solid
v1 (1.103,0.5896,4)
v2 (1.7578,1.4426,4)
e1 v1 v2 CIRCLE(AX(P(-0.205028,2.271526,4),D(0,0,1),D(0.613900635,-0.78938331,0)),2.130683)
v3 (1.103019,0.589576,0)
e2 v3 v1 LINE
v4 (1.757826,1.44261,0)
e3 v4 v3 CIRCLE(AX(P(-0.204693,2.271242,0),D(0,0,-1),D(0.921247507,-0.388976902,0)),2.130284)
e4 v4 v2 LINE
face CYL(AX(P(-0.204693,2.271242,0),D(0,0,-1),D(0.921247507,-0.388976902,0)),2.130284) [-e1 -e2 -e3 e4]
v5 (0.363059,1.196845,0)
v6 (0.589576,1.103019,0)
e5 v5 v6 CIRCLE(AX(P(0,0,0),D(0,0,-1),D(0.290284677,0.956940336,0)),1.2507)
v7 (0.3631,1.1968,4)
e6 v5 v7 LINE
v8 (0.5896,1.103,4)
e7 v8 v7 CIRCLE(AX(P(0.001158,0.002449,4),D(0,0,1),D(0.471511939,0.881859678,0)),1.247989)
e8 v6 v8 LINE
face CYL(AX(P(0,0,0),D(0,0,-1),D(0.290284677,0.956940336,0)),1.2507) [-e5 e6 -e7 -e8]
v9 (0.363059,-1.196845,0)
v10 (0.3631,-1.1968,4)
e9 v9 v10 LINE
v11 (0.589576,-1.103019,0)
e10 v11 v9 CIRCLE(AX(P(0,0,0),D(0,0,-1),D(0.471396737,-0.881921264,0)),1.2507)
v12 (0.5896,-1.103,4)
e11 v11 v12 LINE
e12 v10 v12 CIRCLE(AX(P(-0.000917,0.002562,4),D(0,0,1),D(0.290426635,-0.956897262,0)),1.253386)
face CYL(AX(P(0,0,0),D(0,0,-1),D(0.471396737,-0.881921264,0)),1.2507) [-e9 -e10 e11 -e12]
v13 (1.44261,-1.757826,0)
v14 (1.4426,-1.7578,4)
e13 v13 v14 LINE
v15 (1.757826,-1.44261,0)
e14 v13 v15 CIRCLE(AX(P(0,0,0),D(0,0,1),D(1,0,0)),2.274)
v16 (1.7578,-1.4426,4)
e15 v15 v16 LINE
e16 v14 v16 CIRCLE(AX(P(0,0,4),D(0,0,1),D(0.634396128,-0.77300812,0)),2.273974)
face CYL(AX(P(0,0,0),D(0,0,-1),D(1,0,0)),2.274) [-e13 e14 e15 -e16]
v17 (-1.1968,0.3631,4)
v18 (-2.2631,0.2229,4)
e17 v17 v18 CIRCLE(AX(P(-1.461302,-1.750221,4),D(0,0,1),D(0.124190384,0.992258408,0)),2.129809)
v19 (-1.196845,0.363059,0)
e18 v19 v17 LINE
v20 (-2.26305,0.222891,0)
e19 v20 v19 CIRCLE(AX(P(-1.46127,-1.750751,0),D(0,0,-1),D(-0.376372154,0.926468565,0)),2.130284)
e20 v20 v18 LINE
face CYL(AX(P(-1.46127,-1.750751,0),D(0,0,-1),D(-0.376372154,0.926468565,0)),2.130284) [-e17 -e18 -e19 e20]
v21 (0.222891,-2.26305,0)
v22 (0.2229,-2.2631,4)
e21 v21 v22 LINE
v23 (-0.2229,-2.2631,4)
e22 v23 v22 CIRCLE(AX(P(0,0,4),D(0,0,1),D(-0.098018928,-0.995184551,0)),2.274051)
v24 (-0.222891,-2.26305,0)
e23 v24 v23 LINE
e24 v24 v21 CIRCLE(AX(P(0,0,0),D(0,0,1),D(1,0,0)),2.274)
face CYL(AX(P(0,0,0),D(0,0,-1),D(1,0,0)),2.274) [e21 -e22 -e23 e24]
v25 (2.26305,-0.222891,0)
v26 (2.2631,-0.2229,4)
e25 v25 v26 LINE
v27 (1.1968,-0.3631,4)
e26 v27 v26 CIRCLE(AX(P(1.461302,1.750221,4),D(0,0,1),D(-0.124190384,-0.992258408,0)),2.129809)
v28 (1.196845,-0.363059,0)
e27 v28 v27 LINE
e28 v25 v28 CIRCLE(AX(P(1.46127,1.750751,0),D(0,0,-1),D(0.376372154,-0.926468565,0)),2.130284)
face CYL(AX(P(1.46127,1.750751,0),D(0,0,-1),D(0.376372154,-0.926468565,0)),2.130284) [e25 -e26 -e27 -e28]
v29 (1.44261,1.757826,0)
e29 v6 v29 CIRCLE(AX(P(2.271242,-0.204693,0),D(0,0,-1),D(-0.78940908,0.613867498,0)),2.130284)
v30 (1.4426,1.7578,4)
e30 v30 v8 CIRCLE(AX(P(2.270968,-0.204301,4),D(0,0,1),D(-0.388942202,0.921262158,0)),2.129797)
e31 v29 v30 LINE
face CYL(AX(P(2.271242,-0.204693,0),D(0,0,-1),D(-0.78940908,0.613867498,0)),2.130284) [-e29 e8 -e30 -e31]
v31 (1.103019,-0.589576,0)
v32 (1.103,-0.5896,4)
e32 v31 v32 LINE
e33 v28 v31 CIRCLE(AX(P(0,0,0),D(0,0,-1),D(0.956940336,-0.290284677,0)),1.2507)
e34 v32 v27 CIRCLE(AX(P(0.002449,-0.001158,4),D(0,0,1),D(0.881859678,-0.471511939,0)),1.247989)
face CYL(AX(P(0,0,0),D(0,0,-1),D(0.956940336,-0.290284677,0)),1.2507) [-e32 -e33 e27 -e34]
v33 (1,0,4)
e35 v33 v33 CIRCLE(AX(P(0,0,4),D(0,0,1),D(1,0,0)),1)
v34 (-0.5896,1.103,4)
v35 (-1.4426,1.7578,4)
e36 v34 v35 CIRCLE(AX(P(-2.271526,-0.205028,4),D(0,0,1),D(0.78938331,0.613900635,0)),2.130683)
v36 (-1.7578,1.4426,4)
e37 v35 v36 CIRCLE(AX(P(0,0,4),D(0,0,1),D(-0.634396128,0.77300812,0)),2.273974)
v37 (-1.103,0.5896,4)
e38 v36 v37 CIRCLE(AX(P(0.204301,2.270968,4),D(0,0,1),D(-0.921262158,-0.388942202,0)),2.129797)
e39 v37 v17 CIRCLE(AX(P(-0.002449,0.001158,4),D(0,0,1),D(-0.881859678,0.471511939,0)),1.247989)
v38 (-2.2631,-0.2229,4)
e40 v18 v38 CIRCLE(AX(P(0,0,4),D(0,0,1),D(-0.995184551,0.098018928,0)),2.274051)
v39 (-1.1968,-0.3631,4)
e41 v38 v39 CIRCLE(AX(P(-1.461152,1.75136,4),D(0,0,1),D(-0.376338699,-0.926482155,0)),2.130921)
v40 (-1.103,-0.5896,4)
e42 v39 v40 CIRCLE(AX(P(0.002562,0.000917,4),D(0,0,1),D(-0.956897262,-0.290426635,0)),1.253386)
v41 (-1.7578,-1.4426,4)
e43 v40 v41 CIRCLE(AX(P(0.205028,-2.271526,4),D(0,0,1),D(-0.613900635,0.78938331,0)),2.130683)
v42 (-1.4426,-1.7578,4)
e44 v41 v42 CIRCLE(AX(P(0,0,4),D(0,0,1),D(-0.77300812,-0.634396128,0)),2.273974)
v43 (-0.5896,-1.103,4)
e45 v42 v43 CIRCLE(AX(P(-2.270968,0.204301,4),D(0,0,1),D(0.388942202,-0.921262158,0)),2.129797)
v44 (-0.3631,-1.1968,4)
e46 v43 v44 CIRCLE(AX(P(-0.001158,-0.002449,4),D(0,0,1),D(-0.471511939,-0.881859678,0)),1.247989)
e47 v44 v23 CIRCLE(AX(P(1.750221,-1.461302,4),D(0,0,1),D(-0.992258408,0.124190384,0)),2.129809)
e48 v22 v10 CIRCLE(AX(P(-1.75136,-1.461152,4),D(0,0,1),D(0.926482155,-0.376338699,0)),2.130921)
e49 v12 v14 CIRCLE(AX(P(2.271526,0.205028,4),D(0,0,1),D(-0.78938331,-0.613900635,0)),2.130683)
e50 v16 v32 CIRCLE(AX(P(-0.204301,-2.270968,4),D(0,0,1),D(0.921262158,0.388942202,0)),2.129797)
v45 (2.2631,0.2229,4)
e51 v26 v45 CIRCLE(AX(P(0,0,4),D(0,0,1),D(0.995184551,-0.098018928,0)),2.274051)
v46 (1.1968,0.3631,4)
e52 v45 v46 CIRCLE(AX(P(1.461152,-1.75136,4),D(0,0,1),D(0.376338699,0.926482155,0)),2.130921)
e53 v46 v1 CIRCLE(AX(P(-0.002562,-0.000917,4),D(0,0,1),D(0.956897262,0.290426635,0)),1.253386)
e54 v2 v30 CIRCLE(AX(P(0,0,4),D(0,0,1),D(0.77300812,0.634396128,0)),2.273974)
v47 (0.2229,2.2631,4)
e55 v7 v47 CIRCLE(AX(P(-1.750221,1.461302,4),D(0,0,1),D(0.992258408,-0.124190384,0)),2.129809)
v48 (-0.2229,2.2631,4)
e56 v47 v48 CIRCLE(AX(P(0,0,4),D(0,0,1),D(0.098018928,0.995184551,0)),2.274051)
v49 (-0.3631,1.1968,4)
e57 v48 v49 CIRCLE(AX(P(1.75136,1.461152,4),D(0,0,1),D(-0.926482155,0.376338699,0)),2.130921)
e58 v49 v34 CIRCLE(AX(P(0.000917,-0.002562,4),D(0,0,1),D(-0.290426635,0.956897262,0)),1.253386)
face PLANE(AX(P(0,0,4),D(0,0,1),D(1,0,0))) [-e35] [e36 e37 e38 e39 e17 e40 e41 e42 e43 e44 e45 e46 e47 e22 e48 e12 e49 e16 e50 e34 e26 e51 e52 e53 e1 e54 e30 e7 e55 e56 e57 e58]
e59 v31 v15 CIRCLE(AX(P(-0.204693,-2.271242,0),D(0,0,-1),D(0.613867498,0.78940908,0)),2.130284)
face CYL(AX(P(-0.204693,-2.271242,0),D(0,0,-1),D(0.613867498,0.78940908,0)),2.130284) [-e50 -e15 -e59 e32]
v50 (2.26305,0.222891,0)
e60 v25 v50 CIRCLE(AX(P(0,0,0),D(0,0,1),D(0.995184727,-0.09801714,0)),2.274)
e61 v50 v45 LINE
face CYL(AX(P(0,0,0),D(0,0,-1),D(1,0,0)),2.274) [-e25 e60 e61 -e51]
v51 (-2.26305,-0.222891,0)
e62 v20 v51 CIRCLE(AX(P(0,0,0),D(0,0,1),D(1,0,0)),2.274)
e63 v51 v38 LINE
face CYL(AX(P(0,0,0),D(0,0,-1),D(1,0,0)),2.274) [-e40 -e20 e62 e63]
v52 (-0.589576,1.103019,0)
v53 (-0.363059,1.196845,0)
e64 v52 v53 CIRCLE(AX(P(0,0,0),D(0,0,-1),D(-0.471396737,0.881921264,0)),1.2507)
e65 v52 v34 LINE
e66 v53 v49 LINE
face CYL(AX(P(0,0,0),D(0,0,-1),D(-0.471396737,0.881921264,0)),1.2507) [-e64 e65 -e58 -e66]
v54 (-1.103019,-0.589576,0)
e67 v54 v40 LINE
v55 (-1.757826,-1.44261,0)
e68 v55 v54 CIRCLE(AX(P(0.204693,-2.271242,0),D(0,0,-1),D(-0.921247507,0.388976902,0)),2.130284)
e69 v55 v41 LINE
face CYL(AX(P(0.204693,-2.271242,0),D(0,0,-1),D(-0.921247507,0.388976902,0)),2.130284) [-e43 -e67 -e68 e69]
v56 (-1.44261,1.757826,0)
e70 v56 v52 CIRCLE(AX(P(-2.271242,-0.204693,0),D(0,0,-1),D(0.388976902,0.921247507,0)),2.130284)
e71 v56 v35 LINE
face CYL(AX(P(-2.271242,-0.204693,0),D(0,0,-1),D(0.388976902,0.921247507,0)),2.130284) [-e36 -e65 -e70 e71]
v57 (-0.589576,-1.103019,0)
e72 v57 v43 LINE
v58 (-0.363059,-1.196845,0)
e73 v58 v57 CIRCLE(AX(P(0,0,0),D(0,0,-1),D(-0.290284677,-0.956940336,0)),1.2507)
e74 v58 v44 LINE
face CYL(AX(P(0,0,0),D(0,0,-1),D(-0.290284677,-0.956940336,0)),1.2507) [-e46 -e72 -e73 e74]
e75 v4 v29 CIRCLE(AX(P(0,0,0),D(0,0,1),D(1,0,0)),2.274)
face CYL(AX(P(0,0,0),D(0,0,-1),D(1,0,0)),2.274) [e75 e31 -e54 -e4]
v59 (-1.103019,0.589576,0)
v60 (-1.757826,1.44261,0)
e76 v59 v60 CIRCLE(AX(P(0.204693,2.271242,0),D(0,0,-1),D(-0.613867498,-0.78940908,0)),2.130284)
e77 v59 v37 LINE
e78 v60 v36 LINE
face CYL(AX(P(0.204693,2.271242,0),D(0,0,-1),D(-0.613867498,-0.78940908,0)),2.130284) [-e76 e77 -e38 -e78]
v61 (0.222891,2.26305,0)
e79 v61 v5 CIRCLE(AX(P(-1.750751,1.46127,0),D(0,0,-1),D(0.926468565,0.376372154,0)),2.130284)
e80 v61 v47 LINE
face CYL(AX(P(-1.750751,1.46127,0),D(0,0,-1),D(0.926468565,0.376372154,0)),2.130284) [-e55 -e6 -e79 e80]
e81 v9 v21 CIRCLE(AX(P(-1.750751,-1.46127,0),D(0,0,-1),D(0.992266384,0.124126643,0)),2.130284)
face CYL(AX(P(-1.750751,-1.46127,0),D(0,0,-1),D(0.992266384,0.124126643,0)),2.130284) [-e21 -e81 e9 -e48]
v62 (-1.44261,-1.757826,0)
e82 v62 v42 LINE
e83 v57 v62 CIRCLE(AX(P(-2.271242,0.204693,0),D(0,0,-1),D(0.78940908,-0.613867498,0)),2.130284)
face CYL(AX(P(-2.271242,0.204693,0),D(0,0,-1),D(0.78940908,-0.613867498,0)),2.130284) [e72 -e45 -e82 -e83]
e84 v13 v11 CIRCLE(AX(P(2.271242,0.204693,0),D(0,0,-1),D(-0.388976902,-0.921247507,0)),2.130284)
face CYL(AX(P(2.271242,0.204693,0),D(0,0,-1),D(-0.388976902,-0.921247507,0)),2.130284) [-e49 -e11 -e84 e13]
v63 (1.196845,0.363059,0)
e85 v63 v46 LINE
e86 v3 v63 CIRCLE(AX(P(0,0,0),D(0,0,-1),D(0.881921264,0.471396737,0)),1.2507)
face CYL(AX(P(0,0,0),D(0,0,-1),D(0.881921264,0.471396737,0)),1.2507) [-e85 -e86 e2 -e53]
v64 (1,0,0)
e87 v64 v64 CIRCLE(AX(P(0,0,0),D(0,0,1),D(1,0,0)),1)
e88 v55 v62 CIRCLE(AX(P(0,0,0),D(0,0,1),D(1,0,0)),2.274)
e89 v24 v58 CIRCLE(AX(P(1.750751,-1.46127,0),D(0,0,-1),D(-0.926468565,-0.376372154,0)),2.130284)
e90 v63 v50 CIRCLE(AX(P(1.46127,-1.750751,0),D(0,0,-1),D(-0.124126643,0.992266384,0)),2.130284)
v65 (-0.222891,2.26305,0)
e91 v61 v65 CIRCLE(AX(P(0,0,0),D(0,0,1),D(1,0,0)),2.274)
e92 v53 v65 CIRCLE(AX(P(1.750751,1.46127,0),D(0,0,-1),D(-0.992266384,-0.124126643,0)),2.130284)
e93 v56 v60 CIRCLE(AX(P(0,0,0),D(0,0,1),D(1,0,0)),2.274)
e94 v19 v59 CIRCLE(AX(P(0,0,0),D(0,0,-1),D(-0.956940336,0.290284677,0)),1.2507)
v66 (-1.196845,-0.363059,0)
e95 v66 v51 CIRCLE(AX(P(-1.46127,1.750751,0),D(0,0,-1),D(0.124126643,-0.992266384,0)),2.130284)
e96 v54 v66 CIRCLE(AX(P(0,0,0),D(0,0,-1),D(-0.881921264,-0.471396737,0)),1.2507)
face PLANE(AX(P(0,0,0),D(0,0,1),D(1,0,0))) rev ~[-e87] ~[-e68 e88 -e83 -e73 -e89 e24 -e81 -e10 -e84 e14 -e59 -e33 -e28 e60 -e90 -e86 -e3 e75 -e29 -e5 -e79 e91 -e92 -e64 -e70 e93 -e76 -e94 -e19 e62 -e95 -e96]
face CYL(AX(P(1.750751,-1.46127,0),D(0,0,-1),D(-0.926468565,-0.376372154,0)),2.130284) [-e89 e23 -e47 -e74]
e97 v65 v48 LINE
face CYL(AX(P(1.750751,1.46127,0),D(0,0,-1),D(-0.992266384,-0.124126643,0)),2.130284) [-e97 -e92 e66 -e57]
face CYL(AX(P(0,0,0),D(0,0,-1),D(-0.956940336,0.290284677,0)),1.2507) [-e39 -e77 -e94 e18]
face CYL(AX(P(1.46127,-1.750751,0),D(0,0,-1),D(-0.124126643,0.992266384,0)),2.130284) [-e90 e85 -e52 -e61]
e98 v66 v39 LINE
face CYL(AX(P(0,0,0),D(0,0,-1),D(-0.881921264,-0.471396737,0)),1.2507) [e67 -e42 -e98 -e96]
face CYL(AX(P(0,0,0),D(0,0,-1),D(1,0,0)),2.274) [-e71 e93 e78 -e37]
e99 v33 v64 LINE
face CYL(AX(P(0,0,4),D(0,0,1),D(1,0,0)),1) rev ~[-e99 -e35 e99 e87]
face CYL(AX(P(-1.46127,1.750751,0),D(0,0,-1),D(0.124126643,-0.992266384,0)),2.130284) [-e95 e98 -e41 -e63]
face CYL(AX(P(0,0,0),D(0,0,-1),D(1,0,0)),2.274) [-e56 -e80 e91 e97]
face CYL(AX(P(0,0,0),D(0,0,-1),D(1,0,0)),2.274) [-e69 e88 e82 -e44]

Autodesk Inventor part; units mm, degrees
sketch "Sketch1" plane through (0, 0, 0) normal (0, 0, 1) x (1, 0, 0)
  circle A0 centre (0, 0) radius 2.274
  dimension "d0" = 4.548
extrude "Extrusion1" add sketch "Sketch1" along normal blind 20
ref_plane "Work Plane2" through (0, 0, 10) normal (0, 0, 1) x (1, 0, 0)
sketch "Sketch2" plane through (0, 0, 0) normal (0, 0, -1) x (-1, 0, 0)
  circle A0 centre (0, 0) radius 2.274 projected
  circle A1 centre (0, 0) radius 1.8192
  dimension "d3" = 3.6384
surface extrude "Pitch Diameter" sketch "Sketch2" against normal through all shown no curves A1
ref_plane "Work Plane8" through (0, 0, 0) normal (0.9238795, 0.3826834, 0) x (0, 0, 1)
ref_plane "Work Plane9" through (0, 0, 0) normal (1, 0, 0) x (0, 1, 0)
spur gear teeth "Spur Gear" teeth 8 pitch diameter 3.6384 tip diameter 4.548 root diameter 2.5014 face width 20 start plane through (0, 0, 0) normal (0, 0, -1) x (-1, 0, 0)
sketch "Sketch3" plane through (0, 0, 20) normal (0, 0, 1) x (1, 0, 0)
  arc A0 (-1.7578, 1.4426) -> (-1.103, 0.5896) centre (0.2047, 2.2712) ccw projected
  arc A1 (-1.103, 0.5896) -> (-1.1968, 0.3631) centre (0, 0) ccw projected
  arc A2 (-1.1968, 0.3631) -> (-2.2631, 0.2229) centre (-1.4613, -1.7508) ccw projected
  arc A3 (-2.2631, 0.2229) -> (-2.2631, -0.2229) centre (0, 0) ccw projected
  arc A4 (-2.2631, -0.2229) -> (-1.1968, -0.3631) centre (-1.4613, 1.7508) ccw projected
  arc A5 (-1.1968, -0.3631) -> (-1.103, -0.5896) centre (0, 0) ccw projected
  arc A6 (-1.103, -0.5896) -> (-1.7578, -1.4426) centre (0.2047, -2.2712) ccw projected
  arc A7 (-1.7578, -1.4426) -> (-1.4426, -1.7578) centre (0, 0) ccw projected
  arc A8 (-1.4426, -1.7578) -> (-0.5896, -1.103) centre (-2.2712, 0.2047) ccw projected
  arc A9 (-0.5896, -1.103) -> (-0.3631, -1.1968) centre (0, 0) ccw projected
  arc A10 (-0.3631, -1.1968) -> (-0.2229, -2.2631) centre (1.7508, -1.4613) ccw projected
  arc A11 (-0.2229, -2.2631) -> (0.2229, -2.2631) centre (0, 0) ccw projected
  arc A12 (0.2229, -2.2631) -> (0.3631, -1.1968) centre (-1.7508, -1.4613) ccw projected
  arc A13 (0.3631, -1.1968) -> (0.5896, -1.103) centre (0, 0) ccw projected
  arc A14 (0.5896, -1.103) -> (1.4426, -1.7578) centre (2.2712, 0.2047) ccw projected
  arc A15 (1.4426, -1.7578) -> (1.7578, -1.4426) centre (0, 0) ccw projected
  arc A16 (1.7578, -1.4426) -> (1.103, -0.5896) centre (-0.2047, -2.2712) ccw projected
  arc A17 (1.103, -0.5896) -> (1.1968, -0.3631) centre (0, 0) ccw projected
  arc A18 (1.1968, -0.3631) -> (2.2631, -0.2229) centre (1.4613, 1.7508) ccw projected
  arc A19 (2.2631, -0.2229) -> (2.2631, 0.2229) centre (0, 0) ccw projected
  arc A20 (2.2631, 0.2229) -> (1.1968, 0.3631) centre (1.4613, -1.7508) ccw projected
  arc A21 (1.1968, 0.3631) -> (1.103, 0.5896) centre (0, 0) ccw projected
  arc A22 (1.103, 0.5896) -> (1.7578, 1.4426) centre (-0.2047, 2.2712) ccw projected
  arc A23 (1.7578, 1.4426) -> (1.4426, 1.7578) centre (0, 0) ccw projected
  arc A24 (1.4426, 1.7578) -> (0.5896, 1.103) centre (2.2712, -0.2047) ccw projected
  arc A25 (0.5896, 1.103) -> (0.3631, 1.1968) centre (0, 0) ccw projected
  arc A26 (0.3631, 1.1968) -> (0.2229, 2.2631) centre (-1.7508, 1.4613) ccw projected
  arc A27 (0.2229, 2.2631) -> (-0.2229, 2.2631) centre (0, 0) ccw projected
  arc A28 (-0.2229, 2.2631) -> (-0.3631, 1.1968) centre (1.7508, 1.4613) ccw projected
  arc A29 (-0.3631, 1.1968) -> (-0.5896, 1.103) centre (0, 0) ccw projected
  arc A30 (-0.5896, 1.103) -> (-1.4426, 1.7578) centre (-2.2712, -0.2047) ccw projected
  arc A31 (-1.4426, 1.7578) -> (-1.7578, 1.4426) centre (0, 0) ccw projected
ref_plane "Work Plane11" through (-4.2612, 0.6505, 4) normal (0, 0, 1) x (0.9749279, -0.2225209, 0)
extrude "Extrusion2" cut sketch "Sketch3" against normal up to surface (16 mm away)
sketch "Sketch4" plane through (0, 0, 4) normal (0, 0, 1) x (1, 0, 0)
  arc A0 (-1.1968, 0.3631) -> (-2.2631, 0.2229) centre (-1.4613, -1.7508) ccw projected
  arc A1 (-2.2631, 0.2229) -> (-2.2631, -0.2229) centre (0, 0) ccw projected
  arc A2 (-2.2631, -0.2229) -> (-1.1968, -0.3631) centre (-1.4613, 1.7508) ccw projected
  arc A3 (-1.1968, -0.3631) -> (-1.103, -0.5896) centre (0, 0) ccw projected
  arc A4 (-1.103, -0.5896) -> (-1.7578, -1.4426) centre (0.2047, -2.2712) ccw projected
  arc A5 (-1.7578, -1.4426) -> (-1.4426, -1.7578) centre (0, 0) ccw projected
  arc A6 (-1.4426, -1.7578) -> (-0.5896, -1.103) centre (-2.2712, 0.2047) ccw projected
  arc A7 (-0.5896, -1.103) -> (-0.3631, -1.1968) centre (0, 0) ccw projected
  arc A8 (-0.3631, -1.1968) -> (-0.2229, -2.2631) centre (1.7508, -1.4613) ccw projected
  arc A9 (-0.2229, -2.2631) -> (0.2229, -2.2631) centre (0, 0) ccw projected
  arc A10 (0.2229, -2.2631) -> (0.3631, -1.1968) centre (-1.7508, -1.4613) ccw projected
  arc A11 (0.3631, -1.1968) -> (0.5896, -1.103) centre (0, 0) ccw projected
  arc A12 (0.5896, -1.103) -> (1.4426, -1.7578) centre (2.2712, 0.2047) ccw projected
  arc A13 (1.4426, -1.7578) -> (1.7578, -1.4426) centre (0, 0) ccw projected
  arc A14 (1.7578, -1.4426) -> (1.103, -0.5896) centre (-0.2047, -2.2712) ccw projected
  arc A15 (1.103, -0.5896) -> (1.1968, -0.3631) centre (0, 0) ccw projected
  arc A16 (1.1968, -0.3631) -> (2.2631, -0.2229) centre (1.4613, 1.7508) ccw projected
  arc A17 (2.2631, -0.2229) -> (2.2631, 0.2229) centre (0, 0) ccw projected
  arc A18 (2.2631, 0.2229) -> (1.1968, 0.3631) centre (1.4613, -1.7508) ccw projected
  arc A19 (1.1968, 0.3631) -> (1.103, 0.5896) centre (0, 0) ccw projected
  arc A20 (1.103, 0.5896) -> (1.7578, 1.4426) centre (-0.2047, 2.2712) ccw projected
  arc A21 (1.7578, 1.4426) -> (1.4426, 1.7578) centre (0, 0) ccw projected
  arc A22 (1.4426, 1.7578) -> (0.5896, 1.103) centre (2.2712, -0.2047) ccw projected
  arc A23 (0.5896, 1.103) -> (0.3631, 1.1968) centre (0, 0) ccw projected
  arc A24 (0.3631, 1.1968) -> (0.2229, 2.2631) centre (-1.7508, 1.4613) ccw projected
  arc A25 (0.2229, 2.2631) -> (-0.2229, 2.2631) centre (0, 0) ccw projected
  arc A26 (-0.2229, 2.2631) -> (-0.3631, 1.1968) centre (1.7508, 1.4613) ccw projected
  arc A27 (-0.3631, 1.1968) -> (-0.5896, 1.103) centre (0, 0) ccw projected
  arc A28 (-0.5896, 1.103) -> (-1.4426, 1.7578) centre (-2.2712, -0.2047) ccw projected
  arc A29 (-1.4426, 1.7578) -> (-1.7578, 1.4426) centre (0, 0) ccw projected
  arc A30 (-1.7578, 1.4426) -> (-1.103, 0.5896) centre (0.2047, 2.2712) ccw projected
  arc A31 (-1.103, 0.5896) -> (-1.1968, 0.3631) centre (0, 0) ccw projected
  circle A32 centre (0, 0) radius 1
  dimension "d51" = 2
extrude "Extrusion3" cut sketch "Sketch4" against normal through all contours A32
equation "\"d0\" = da_da"
equation "\"d1\" = da_b"
equation "\"d3\" = da_d"
equation "\"d16\" = da_aw"
equation "\"d43\" = da_aw"
equation "\"d46\" = da_aw"
equation "\"da_da\" = 4.548"
equation "\"da_b\" = 20"
equation "\"da_d\" = 3.6384"
equation "\"da_aw\" = 5.0028"
properties part number "Spur Gear1" material "Steel"
